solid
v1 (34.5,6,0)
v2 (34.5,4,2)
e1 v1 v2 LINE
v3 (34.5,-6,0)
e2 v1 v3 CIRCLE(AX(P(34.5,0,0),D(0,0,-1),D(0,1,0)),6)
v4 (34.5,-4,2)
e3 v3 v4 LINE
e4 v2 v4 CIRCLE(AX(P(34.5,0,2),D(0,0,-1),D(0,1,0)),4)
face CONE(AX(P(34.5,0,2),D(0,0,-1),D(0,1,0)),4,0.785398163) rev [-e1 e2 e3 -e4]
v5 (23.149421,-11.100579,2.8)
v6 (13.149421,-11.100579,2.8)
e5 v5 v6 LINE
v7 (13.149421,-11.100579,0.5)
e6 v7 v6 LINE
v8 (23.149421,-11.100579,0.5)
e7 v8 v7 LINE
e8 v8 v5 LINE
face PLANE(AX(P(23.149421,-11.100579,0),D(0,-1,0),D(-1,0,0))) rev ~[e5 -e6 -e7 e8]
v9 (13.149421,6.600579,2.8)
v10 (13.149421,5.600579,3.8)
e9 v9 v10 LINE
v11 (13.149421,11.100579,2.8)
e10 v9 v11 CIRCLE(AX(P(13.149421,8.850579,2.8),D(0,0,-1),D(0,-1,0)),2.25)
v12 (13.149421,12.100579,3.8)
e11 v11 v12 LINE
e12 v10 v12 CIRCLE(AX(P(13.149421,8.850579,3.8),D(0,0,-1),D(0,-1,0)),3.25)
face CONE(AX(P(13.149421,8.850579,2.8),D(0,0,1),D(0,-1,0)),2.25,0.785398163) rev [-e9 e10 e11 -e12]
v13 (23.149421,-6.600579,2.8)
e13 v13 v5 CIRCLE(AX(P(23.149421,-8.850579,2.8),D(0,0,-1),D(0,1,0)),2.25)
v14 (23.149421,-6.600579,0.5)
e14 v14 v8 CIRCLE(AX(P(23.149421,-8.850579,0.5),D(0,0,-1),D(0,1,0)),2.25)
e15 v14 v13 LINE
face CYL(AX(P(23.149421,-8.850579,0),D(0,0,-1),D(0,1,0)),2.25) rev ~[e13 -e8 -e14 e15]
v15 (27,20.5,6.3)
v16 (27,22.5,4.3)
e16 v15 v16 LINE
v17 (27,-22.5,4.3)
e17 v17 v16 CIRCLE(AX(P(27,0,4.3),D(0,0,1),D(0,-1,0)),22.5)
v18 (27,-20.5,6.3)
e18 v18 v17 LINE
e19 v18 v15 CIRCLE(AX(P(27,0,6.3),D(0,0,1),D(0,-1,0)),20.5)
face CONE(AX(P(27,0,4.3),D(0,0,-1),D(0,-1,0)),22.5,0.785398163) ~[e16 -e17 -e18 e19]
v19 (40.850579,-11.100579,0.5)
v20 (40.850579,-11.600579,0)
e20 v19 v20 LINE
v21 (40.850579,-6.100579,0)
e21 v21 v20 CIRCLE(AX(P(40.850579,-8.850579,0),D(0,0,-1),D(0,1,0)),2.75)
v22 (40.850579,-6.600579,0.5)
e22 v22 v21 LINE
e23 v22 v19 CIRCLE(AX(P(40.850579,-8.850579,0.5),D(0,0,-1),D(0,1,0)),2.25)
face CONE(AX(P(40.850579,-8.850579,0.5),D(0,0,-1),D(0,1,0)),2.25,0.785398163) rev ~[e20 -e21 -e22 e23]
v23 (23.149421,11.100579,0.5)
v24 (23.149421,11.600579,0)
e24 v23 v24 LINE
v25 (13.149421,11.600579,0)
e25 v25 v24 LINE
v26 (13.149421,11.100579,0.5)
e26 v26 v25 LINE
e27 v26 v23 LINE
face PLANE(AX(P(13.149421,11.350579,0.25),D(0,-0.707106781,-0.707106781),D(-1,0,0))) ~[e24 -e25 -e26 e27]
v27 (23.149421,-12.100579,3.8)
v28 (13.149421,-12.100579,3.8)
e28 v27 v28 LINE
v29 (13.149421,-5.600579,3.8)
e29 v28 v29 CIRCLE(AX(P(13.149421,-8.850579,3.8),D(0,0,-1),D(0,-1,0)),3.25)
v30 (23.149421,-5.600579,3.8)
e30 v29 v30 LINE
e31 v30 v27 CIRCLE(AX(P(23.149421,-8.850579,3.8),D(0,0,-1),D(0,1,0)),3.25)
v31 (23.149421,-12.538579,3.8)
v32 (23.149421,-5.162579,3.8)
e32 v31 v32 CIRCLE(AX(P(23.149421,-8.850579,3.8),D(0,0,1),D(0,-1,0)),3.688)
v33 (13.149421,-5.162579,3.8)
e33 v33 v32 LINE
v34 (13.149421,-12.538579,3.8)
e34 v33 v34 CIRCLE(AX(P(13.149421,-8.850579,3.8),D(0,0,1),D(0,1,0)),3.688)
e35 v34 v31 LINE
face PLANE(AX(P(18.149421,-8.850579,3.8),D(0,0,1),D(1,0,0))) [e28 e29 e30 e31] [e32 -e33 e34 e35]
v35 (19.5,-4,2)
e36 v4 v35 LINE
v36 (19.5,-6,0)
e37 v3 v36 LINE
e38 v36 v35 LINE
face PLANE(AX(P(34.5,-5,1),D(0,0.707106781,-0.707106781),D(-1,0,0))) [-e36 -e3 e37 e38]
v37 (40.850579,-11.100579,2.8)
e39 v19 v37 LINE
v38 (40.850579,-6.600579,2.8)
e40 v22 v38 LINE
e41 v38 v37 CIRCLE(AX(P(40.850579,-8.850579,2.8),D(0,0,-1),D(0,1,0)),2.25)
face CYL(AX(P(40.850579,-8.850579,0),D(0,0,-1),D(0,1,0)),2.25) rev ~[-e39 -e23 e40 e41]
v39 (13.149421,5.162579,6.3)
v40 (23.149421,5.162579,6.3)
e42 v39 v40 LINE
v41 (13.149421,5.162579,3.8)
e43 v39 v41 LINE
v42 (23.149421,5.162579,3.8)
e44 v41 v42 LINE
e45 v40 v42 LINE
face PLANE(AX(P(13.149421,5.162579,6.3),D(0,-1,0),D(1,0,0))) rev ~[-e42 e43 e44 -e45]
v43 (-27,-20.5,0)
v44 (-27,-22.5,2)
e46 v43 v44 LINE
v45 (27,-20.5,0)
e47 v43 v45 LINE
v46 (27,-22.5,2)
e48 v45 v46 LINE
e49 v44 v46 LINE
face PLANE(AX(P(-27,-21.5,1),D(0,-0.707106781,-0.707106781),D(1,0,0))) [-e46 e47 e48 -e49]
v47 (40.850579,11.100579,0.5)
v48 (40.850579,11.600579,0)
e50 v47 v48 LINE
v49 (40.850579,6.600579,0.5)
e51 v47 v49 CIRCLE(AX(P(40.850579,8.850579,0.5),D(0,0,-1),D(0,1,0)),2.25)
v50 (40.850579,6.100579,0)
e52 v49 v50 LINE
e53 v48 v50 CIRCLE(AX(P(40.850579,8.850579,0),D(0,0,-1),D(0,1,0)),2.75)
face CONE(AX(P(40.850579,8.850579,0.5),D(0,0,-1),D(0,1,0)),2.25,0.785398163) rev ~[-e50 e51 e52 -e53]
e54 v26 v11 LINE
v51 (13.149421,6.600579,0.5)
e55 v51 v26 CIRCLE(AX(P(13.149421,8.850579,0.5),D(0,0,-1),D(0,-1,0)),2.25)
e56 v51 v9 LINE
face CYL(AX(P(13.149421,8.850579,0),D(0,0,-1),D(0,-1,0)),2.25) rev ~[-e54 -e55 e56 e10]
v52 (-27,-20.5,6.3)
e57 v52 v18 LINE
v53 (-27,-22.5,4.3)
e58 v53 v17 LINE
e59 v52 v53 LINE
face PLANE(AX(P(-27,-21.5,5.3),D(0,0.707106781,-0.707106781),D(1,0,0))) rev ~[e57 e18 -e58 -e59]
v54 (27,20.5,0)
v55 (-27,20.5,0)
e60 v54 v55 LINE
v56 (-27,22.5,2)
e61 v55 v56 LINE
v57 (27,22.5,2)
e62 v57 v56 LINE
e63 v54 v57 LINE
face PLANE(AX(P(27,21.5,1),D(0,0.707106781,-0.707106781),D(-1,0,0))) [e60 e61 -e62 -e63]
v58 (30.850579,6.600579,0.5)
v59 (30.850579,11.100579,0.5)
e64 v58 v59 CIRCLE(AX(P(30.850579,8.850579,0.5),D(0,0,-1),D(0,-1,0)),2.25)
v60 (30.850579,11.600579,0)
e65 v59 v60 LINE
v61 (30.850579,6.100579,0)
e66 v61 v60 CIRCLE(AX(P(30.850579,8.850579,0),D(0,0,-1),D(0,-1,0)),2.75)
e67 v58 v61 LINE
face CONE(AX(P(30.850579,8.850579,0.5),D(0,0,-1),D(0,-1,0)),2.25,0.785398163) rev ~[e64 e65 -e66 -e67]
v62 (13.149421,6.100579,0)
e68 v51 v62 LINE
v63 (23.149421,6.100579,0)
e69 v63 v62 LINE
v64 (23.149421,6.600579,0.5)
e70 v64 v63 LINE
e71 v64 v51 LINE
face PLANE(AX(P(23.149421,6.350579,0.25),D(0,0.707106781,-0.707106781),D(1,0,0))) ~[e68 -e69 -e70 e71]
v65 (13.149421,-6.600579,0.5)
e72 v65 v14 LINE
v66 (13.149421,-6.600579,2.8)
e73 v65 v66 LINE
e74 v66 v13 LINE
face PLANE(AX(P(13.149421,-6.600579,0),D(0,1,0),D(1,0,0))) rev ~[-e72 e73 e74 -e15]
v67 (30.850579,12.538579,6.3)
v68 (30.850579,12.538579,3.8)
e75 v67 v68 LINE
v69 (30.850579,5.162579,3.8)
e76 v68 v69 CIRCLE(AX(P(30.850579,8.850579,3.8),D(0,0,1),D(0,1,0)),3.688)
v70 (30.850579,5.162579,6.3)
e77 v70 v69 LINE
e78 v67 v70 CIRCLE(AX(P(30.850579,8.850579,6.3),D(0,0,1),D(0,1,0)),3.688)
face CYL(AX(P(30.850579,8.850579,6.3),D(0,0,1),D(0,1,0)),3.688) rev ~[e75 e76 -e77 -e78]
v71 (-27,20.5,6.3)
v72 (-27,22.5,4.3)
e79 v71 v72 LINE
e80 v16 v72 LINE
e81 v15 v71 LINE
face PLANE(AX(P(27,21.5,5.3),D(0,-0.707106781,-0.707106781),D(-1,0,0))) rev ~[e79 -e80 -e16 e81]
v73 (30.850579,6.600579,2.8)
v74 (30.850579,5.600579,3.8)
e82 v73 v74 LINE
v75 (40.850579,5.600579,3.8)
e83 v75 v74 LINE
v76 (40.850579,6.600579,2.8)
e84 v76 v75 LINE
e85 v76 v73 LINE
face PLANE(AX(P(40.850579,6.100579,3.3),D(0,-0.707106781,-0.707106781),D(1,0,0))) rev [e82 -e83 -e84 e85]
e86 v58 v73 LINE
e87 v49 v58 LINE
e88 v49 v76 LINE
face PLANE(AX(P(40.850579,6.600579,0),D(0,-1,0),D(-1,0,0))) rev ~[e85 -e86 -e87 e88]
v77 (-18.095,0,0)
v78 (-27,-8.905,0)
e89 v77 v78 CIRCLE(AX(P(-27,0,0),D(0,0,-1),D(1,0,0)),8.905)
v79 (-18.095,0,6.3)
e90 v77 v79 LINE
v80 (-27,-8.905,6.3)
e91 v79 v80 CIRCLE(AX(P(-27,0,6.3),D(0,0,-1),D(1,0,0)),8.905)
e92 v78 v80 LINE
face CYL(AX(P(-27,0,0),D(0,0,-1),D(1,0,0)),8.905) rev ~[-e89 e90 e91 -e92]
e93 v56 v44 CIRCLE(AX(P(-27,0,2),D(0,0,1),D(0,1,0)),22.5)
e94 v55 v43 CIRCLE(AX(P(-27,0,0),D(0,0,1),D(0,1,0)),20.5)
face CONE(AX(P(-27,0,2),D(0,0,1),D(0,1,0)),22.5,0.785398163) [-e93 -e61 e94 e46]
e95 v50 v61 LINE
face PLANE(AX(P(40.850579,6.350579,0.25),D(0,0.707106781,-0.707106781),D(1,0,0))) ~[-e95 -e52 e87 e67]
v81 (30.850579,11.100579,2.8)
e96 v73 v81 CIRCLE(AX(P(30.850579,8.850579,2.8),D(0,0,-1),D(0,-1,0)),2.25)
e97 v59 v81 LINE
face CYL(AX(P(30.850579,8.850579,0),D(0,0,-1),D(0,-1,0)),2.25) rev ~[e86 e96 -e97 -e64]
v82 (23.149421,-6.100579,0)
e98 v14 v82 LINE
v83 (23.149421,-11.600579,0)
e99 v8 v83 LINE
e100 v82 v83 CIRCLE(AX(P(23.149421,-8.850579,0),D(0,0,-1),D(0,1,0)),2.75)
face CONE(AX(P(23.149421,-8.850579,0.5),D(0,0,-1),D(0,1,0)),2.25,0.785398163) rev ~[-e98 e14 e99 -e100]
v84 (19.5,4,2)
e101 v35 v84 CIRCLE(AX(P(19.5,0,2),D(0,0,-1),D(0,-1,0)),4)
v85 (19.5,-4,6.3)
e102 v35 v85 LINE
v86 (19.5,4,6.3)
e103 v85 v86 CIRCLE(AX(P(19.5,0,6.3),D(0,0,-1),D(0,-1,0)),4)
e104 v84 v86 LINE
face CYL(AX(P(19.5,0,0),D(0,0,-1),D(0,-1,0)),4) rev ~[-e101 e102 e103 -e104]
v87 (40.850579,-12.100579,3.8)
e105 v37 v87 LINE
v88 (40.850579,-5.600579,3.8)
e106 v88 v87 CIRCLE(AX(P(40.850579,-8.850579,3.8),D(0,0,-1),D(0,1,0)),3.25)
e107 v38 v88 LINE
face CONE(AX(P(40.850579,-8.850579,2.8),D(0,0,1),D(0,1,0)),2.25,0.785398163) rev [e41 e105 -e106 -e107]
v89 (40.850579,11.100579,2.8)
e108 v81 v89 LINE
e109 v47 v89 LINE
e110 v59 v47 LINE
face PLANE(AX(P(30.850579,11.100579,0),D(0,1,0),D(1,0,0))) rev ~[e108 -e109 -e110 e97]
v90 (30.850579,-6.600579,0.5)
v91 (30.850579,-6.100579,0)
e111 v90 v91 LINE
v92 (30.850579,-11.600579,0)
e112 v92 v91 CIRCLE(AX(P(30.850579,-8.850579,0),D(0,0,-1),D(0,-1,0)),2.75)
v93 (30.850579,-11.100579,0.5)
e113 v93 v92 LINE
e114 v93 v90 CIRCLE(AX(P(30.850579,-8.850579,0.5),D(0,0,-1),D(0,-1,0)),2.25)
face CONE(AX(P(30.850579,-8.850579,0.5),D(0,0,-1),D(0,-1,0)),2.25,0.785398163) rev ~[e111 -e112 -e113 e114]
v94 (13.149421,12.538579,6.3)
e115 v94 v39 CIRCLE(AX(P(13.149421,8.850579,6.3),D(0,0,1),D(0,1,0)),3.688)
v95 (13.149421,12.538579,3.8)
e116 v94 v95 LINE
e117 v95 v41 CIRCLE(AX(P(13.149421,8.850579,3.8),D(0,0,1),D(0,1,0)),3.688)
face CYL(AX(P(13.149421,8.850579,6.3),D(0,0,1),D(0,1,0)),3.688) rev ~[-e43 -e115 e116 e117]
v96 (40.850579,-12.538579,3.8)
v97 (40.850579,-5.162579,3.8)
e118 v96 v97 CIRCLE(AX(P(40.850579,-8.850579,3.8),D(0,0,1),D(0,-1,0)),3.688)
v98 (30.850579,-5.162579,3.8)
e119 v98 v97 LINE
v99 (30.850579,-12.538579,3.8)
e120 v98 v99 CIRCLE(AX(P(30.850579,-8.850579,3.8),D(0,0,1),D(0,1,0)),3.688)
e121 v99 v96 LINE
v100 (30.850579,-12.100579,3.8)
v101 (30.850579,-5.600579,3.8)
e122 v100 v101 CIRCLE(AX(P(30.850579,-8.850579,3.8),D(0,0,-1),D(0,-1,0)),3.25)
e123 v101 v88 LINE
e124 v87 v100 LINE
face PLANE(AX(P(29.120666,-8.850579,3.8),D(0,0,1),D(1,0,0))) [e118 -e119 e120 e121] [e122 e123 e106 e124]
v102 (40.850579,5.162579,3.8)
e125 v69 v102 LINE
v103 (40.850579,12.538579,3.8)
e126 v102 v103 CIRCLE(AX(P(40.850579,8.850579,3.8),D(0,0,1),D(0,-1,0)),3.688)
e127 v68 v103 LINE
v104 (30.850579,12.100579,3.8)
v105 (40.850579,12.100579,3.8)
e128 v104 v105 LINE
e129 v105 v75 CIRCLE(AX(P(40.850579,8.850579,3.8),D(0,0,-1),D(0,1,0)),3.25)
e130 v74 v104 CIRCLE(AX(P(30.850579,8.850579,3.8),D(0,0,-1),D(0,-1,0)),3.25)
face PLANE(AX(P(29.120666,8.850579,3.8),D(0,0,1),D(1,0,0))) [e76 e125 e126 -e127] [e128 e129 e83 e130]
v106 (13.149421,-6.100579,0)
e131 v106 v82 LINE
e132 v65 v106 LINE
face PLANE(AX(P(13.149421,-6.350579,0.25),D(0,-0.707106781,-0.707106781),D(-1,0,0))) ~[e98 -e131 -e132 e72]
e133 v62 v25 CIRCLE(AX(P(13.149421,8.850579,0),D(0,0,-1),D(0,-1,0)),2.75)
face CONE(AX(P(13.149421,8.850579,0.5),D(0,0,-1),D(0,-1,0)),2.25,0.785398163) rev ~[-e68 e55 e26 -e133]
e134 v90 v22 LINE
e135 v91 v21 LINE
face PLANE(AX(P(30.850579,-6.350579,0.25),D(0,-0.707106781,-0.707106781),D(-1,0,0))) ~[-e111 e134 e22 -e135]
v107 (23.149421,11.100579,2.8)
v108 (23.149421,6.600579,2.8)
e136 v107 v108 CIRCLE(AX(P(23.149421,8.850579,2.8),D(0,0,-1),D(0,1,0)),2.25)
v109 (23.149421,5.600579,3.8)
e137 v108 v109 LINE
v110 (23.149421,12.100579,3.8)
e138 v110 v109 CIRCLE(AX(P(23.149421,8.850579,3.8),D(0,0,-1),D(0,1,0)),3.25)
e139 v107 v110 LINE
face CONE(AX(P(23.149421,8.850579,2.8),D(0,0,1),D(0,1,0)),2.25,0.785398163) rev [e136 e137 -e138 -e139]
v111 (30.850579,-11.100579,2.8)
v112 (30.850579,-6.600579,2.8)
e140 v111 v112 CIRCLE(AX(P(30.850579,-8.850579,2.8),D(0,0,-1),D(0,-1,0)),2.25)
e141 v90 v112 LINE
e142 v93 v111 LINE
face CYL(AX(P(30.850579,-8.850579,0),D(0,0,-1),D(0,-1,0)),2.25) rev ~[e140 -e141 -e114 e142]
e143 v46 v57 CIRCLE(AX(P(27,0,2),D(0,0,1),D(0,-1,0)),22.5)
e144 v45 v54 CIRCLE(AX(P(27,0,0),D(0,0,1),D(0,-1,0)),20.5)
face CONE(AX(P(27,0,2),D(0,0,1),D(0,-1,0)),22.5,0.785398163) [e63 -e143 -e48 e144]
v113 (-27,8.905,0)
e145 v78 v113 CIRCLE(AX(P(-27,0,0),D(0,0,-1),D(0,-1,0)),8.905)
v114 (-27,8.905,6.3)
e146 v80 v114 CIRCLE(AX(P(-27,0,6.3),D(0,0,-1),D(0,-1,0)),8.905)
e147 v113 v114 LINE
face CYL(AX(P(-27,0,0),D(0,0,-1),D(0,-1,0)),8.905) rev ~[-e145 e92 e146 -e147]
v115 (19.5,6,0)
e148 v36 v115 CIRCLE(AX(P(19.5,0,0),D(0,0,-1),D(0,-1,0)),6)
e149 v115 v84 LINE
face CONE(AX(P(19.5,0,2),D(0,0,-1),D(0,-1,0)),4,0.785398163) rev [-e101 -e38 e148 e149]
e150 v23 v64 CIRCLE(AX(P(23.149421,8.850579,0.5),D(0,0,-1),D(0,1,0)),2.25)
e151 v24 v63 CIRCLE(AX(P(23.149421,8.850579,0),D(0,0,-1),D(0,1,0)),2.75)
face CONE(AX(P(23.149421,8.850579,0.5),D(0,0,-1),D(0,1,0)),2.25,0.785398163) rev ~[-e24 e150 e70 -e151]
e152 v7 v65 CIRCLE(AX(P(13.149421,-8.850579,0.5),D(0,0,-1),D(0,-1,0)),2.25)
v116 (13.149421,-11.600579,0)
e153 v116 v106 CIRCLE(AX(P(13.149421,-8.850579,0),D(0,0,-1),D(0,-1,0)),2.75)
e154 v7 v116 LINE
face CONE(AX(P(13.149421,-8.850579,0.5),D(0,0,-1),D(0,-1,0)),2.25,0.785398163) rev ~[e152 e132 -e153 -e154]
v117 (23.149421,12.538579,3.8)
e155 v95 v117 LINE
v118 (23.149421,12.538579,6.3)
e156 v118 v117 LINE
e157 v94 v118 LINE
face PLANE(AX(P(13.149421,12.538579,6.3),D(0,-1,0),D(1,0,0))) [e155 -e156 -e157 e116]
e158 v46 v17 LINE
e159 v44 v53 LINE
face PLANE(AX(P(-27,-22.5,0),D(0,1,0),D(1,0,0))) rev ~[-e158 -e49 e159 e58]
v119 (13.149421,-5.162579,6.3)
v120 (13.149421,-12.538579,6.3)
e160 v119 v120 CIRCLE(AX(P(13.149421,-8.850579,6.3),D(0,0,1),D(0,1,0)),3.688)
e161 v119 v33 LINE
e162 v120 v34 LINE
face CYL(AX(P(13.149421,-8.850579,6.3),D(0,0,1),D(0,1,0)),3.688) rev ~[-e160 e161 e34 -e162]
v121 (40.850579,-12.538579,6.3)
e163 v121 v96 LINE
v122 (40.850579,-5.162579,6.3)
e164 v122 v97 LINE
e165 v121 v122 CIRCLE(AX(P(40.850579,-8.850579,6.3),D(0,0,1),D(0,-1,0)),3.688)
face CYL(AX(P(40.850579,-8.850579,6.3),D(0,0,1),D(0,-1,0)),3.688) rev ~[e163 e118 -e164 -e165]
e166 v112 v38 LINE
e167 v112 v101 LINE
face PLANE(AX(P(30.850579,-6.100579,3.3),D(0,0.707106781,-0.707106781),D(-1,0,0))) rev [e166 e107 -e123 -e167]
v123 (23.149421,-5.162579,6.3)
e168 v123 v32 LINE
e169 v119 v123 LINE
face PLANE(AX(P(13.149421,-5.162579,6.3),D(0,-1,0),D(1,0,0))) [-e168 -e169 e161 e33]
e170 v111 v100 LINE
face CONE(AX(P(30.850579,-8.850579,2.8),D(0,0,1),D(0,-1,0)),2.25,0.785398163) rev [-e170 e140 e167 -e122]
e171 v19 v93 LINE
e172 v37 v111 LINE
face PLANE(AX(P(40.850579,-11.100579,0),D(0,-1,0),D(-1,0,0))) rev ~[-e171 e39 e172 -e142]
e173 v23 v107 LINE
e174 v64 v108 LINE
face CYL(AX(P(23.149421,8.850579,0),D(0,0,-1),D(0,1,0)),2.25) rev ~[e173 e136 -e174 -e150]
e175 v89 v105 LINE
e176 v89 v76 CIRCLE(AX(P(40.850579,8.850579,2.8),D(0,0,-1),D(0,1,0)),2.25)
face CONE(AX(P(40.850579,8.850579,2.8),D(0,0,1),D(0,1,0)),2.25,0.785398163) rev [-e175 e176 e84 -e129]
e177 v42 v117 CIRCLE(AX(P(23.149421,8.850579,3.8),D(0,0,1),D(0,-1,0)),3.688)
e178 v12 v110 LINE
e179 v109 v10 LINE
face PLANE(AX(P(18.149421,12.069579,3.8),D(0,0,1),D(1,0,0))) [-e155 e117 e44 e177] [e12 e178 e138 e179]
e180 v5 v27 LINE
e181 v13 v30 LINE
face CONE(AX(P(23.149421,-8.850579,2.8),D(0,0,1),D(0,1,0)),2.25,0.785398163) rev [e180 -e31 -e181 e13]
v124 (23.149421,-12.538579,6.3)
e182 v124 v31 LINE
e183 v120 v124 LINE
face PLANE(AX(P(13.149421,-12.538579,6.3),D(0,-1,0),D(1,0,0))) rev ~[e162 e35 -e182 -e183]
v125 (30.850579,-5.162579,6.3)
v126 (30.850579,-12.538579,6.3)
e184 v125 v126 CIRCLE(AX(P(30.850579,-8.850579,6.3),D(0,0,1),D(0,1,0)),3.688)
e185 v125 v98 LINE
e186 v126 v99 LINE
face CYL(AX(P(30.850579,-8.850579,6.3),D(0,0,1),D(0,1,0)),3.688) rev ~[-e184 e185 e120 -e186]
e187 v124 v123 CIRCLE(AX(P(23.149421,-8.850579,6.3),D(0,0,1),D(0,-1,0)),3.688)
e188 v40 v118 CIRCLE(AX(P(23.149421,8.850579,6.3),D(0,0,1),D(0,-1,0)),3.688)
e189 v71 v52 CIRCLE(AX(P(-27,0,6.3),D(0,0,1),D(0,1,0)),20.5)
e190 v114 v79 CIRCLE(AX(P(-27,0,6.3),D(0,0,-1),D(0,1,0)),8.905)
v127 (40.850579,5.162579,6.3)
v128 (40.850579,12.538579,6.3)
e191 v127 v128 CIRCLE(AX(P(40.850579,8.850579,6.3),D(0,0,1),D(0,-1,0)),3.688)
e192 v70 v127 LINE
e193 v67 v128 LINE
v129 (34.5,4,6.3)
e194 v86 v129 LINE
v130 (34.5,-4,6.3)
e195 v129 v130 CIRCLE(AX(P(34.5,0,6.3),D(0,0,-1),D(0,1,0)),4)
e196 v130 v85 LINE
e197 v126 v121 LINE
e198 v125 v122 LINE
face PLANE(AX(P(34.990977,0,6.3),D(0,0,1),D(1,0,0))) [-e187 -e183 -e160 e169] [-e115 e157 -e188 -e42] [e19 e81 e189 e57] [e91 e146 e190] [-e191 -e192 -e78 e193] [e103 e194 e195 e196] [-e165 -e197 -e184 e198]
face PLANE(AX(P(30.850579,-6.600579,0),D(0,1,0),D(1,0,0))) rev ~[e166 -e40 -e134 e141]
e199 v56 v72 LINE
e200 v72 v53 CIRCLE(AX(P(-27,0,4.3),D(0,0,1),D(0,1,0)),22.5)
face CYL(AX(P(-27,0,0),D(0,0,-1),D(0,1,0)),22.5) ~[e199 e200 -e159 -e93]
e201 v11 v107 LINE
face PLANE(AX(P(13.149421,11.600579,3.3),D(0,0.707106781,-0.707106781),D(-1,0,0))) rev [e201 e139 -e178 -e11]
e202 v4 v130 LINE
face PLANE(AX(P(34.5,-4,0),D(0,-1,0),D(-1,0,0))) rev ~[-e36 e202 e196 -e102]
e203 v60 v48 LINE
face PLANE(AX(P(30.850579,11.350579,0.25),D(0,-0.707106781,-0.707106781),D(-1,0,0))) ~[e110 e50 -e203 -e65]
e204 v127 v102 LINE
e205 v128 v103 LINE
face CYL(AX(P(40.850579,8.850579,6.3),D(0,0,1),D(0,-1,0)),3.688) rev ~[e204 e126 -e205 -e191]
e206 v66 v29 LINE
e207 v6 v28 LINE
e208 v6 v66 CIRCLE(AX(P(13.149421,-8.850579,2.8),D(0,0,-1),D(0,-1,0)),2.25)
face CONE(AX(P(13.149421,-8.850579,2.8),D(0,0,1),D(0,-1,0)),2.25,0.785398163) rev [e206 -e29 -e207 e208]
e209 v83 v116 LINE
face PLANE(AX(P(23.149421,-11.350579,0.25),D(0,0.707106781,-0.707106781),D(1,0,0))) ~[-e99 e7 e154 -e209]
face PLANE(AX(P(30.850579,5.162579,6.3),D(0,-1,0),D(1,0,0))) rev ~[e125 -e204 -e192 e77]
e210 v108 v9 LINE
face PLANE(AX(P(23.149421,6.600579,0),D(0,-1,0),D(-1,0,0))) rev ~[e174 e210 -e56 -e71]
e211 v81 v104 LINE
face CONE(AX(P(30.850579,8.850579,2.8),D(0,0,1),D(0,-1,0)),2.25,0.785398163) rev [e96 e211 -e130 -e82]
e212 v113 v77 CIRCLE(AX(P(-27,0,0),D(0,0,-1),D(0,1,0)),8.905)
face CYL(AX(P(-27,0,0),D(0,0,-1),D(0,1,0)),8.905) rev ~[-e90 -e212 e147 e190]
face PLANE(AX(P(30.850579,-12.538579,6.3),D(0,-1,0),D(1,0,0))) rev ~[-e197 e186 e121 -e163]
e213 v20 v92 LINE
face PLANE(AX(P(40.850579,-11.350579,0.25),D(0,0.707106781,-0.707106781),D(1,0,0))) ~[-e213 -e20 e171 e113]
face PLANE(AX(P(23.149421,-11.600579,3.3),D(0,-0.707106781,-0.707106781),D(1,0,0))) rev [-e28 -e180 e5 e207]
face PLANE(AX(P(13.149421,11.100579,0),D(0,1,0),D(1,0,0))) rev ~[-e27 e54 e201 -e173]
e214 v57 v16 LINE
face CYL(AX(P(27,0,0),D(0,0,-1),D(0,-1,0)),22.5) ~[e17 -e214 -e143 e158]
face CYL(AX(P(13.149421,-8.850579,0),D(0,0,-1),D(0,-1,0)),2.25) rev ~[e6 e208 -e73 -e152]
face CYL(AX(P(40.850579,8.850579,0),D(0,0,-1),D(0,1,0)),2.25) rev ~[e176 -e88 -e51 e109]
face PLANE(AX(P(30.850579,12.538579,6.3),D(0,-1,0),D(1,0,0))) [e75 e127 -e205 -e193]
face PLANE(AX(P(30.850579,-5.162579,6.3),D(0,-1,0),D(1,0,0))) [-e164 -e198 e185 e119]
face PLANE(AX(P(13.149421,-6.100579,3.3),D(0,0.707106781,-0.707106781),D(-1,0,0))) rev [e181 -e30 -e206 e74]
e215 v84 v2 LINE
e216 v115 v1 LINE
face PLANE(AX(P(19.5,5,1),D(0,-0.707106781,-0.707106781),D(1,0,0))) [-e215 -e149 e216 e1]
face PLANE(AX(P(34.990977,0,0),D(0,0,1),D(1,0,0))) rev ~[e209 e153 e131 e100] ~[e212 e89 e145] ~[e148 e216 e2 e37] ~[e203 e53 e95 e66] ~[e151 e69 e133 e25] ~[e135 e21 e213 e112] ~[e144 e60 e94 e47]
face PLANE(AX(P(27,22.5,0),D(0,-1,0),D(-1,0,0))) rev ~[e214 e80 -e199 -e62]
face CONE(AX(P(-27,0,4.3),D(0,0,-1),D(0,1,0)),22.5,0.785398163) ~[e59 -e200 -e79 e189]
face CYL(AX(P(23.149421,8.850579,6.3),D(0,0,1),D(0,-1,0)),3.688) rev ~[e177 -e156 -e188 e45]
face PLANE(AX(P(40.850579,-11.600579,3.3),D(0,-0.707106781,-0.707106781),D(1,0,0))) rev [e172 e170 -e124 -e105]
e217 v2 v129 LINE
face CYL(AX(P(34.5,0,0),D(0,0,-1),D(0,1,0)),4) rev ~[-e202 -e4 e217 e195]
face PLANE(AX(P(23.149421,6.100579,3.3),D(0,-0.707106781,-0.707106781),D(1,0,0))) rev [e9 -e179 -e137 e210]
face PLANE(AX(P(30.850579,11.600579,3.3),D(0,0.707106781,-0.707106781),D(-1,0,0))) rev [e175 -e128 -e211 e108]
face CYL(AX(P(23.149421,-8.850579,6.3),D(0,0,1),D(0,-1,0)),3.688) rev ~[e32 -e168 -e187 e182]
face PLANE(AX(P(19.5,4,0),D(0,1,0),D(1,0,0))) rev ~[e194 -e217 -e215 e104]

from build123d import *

# Parameters (mm, degrees)
F1_DEPTH = 6.3
F2_SIZE  = 0.5
F3_SIZE  = 2
F4_W     = 10
F4_H     = 0.938
F4_H_2   = 5.5
F5_DEPTH = 2.5
F6_SIZE  = 1
F7_SIZE  = 2


# Not quite as in the source:
# - a feature names something its author has since deleted; it is built from what else it names


with BuildPart() as f1:
    # F0 (on Top) → F1 (new body)
    with BuildSketch(Plane.XY):
        with BuildLine():
            ThreePointArc((27, -22.5), (49.5, 0), (27, 22.5))
            Line((27, 22.5), (27, 4))
            Line((27, 4), (34.5, 4))
            ThreePointArc((34.5, 4), (38.5, 0), (34.5, -4))
            Line((34.5, -4), (27, -4))
            Line((27, -4), (27, -22.5))
        make_face()
        with BuildLine():
            ThreePointArc((30.8505792452, -11.1005792452), (28.6005792452, -8.8505792452), (30.8505792452, -6.6005792452))
            Line((30.8505792452, -6.6005792452), (40.8505792452, -6.6005792452))
            ThreePointArc((40.8505792452, -6.6005792452), (43.1005792452, -8.8505792452), (40.8505792452, -11.1005792452))
            Line((40.8505792452, -11.1005792452), (30.8505792452, -11.1005792452))
        make_face(mode=Mode.SUBTRACT)
        with BuildLine():
            ThreePointArc((30.8505792452, 6.6005792452), (28.6005792452, 8.8505792452), (30.8505792452, 11.1005792452))
            Line((30.8505792452, 11.1005792452), (40.8505792452, 11.1005792452))
            ThreePointArc((40.8505792452, 11.1005792452), (43.1005792452, 8.8505792452), (40.8505792452, 6.6005792452))
            Line((40.8505792452, 6.6005792452), (30.8505792452, 6.6005792452))
        make_face(mode=Mode.SUBTRACT)
        with BuildLine():
            Line((27, 4), (27, 22.5))
            Line((27, 22.5), (-27, 22.5))
            Line((-27, 22.5), (-27, 8.905))
            ThreePointArc((-27, 8.905), (-20.7032141135, 6.2967858865), (-18.095, 0))
            ThreePointArc((-18.095, 0), (-20.7032141135, -6.2967858865), (-27, -8.905))
            Line((-27, -8.905), (-27, -22.5))
            Line((-27, -22.5), (27, -22.5))
            Line((27, -22.5), (27, -4))
            Line((27, -4), (19.5, -4))
            ThreePointArc((19.5, -4), (15.5, 0), (19.5, 4))
            Line((19.5, 4), (27, 4))
        make_face()
        with BuildLine():
            Line((23.1494207548, -11.1005792452), (13.1494207548, -11.1005792452))
            ThreePointArc((13.1494207548, -11.1005792452), (10.8994207548, -8.8505792452), (13.1494207548, -6.6005792452))
            Line((13.1494207548, -6.6005792452), (23.1494207548, -6.6005792452))
            ThreePointArc((23.1494207548, -6.6005792452), (25.3994207548, -8.8505792452), (23.1494207548, -11.1005792452))
        make_face(mode=Mode.SUBTRACT)
        with BuildLine():
            ThreePointArc((13.1494207548, 6.6005792452), (10.8994207548, 8.8505792452), (13.1494207548, 11.1005792452))
            Line((13.1494207548, 11.1005792452), (23.1494207548, 11.1005792452))
            ThreePointArc((23.1494207548, 11.1005792452), (25.3994207548, 8.8505792452), (23.1494207548, 6.6005792452))
            Line((23.1494207548, 6.6005792452), (13.1494207548, 6.6005792452))
        make_face(mode=Mode.SUBTRACT)
        with BuildLine():
            Line((-27, 8.905), (-27, 22.5))
            ThreePointArc((-27, 22.5), (-49.5, 0), (-27, -22.5))
            Line((-27, -22.5), (-27, -8.905))
            ThreePointArc((-27, -8.905), (-35.905, 0), (-27, 8.905))
        make_face()
    extrude(amount=F1_DEPTH)

    # F2
    f2_edges = [f1.edges().sort_by_distance(p)[0] for p in [
        (18.149421, 11.100579, 6.3),
        (35.850579, 11.100579, 6.3),
        (35.850579, -6.600579, 6.3),
        (18.149421, -6.600579, 6.3),
        (35.850579, 11.100579, 0),
        (18.149421, 11.100579, 0),
        (35.850579, -6.600579, 0),
        (18.149421, -6.600579, 0),
        (43.100579, -8.850579, 0),
        (35.850579, -11.100579, 0),
        (28.600579, -8.850579, 0),
        (43.100579, 8.850579, 0),
        (35.850579, 6.600579, 0),
        (28.600579, 8.850579, 0),
        (18.149421, 6.600579, 0),
        (10.899421, 8.850579, 0),
        (25.399421, 8.850579, 0),
        (18.149421, -11.100579, 0),
        (10.899421, -8.850579, 0),
        (25.399421, -8.850579, 0),
    ]]
    chamfer(f2_edges, length=F2_SIZE)

    # F3
    f3_edges = [f1.edges().sort_by_distance(p)[0] for p in [
        (0, -22.5, 6.3),
        (0, -22.5, 0),
    ]]
    chamfer(f3_edges, length=F3_SIZE)

    # F4 (on face) → F5 (cut)
    with BuildSketch(Plane.XY.offset(6.3)):
        with Locations((18.1494207548, 12.0695792452)):
            Rectangle(F4_W, F4_H)
        with BuildLine():
            Line((13.1494207548, 11.6005792452), (13.1494207548, 12.5385792452))
            ThreePointArc((13.1494207548, 12.5385792452), (9.4614207548, 8.8505792452), (13.1494207548, 5.1625792452))
            Line((13.1494207548, 5.1625792452), (13.1494207548, 6.1005792452))
            ThreePointArc((13.1494207548, 6.1005792452), (10.3994207548, 8.8505792452), (13.1494207548, 11.6005792452))
        make_face()
        with BuildLine():
            Line((13.1494207548, 6.1005792452), (13.1494207548, 11.6005792452))
            ThreePointArc((13.1494207548, 11.6005792452), (10.3994207548, 8.8505792452), (13.1494207548, 6.1005792452))
        make_face()
        with Locations((18.1494207548, 8.8505792452)):
            Rectangle(F4_W, F4_H_2)
        with Locations((18.1494207548, 5.6315792452)):
            Rectangle(F4_W, F4_H)
        with BuildLine():
            ThreePointArc((23.1494207548, 6.1005792452), (25.8994207548, 8.8505792452), (23.1494207548, 11.6005792452))
            Line((23.1494207548, 11.6005792452), (23.1494207548, 6.1005792452))
        make_face()
        with BuildLine():
            ThreePointArc((23.1494207548, 5.1625792452), (26.8374207548, 8.8505792452), (23.1494207548, 12.5385792452))
            Line((23.1494207548, 12.5385792452), (23.1494207548, 11.6005792452))
            ThreePointArc((23.1494207548, 11.6005792452), (25.8994207548, 8.8505792452), (23.1494207548, 6.1005792452))
            Line((23.1494207548, 6.1005792452), (23.1494207548, 5.1625792452))
        make_face()
        with BuildLine():
            ThreePointArc((30.8505792452, 12.5385792452), (27.1625792452, 8.8505792452), (30.8505792452, 5.1625792452))
            Line((30.8505792452, 5.1625792452), (30.8505792452, 6.1005792452))
            ThreePointArc((30.8505792452, 6.1005792452), (28.1005792452, 8.8505792452), (30.8505792452, 11.6005792452))
            Line((30.8505792452, 11.6005792452), (30.8505792452, 12.5385792452))
        make_face()
        with BuildLine():
            ThreePointArc((30.8505792452, 11.6005792452), (28.1005792452, 8.8505792452), (30.8505792452, 6.1005792452))
            Line((30.8505792452, 6.1005792452), (30.8505792452, 11.6005792452))
        make_face()
        with Locations((35.8505792452, 8.8505792452)):
            Rectangle(F4_W, F4_H_2)
        with Locations((35.8505792452, 12.0695792452)):
            Rectangle(F4_W, F4_H)
        with Locations((35.8505792452, 5.6315792452)):
            Rectangle(F4_W, F4_H)
        with BuildLine():
            Line((40.8505792452, 6.1005792452), (40.8505792452, 5.1625792452))
            ThreePointArc((40.8505792452, 5.1625792452), (44.5385792452, 8.8505792452), (40.8505792452, 12.5385792452))
            Line((40.8505792452, 12.5385792452), (40.8505792452, 11.6005792452))
            ThreePointArc((40.8505792452, 11.6005792452), (43.6005792452, 8.8505792452), (40.8505792452, 6.1005792452))
        make_face()
        with BuildLine():
            Line((40.8505792452, 11.6005792452), (40.8505792452, 6.1005792452))
            ThreePointArc((40.8505792452, 6.1005792452), (43.6005792452, 8.8505792452), (40.8505792452, 11.6005792452))
        make_face()
        with Locations((18.1494207548, -8.8505792452)):
            Rectangle(F4_W, F4_H_2)
        with BuildLine():
            ThreePointArc((13.1494207548, -6.1005792452), (10.3994207548, -8.8505792452), (13.1494207548, -11.6005792452))
            Line((13.1494207548, -11.6005792452), (13.1494207548, -6.1005792452))
        make_face()
        with BuildLine():
            Line((23.1494207548, -6.1005792452), (23.1494207548, -11.6005792452))
            ThreePointArc((23.1494207548, -11.6005792452), (25.8994207548, -8.8505792452), (23.1494207548, -6.1005792452))
        make_face()
        with Locations((18.1494207548, -5.6315792452)):
            Rectangle(F4_W, F4_H)
        with BuildLine():
            Line((23.1494207548, -11.6005792452), (23.1494207548, -12.5385792452))
            ThreePointArc((23.1494207548, -12.5385792452), (26.8374207548, -8.8505792452), (23.1494207548, -5.1625792452))
            Line((23.1494207548, -5.1625792452), (23.1494207548, -6.1005792452))
            ThreePointArc((23.1494207548, -6.1005792452), (25.8994207548, -8.8505792452), (23.1494207548, -11.6005792452))
        make_face()
        with Locations((18.1494207548, -12.0695792452)):
            Rectangle(F4_W, F4_H)
        with BuildLine():
            ThreePointArc((13.1494207548, -5.1625792452), (9.4614207548, -8.8505792452), (13.1494207548, -12.5385792452))
            Line((13.1494207548, -12.5385792452), (13.1494207548, -11.6005792452))
            ThreePointArc((13.1494207548, -11.6005792452), (10.3994207548, -8.8505792452), (13.1494207548, -6.1005792452))
            Line((13.1494207548, -6.1005792452), (13.1494207548, -5.1625792452))
        make_face()
        with BuildLine():
            ThreePointArc((30.8505792452, -5.1625792452), (27.1625792452, -8.8505792452), (30.8505792452, -12.5385792452))
            Line((30.8505792452, -12.5385792452), (30.8505792452, -11.6005792452))
            ThreePointArc((30.8505792452, -11.6005792452), (28.1005792452, -8.8505792452), (30.8505792452, -6.1005792452))
            Line((30.8505792452, -6.1005792452), (30.8505792452, -5.1625792452))
        make_face()
        with Locations((35.8505792452, -5.6315792452)):
            Rectangle(F4_W, F4_H)
        with Locations((35.8505792452, -8.8505792452)):
            Rectangle(F4_W, F4_H_2)
        with Locations((35.8505792452, -12.0695792452)):
            Rectangle(F4_W, F4_H)
        with BuildLine():
            ThreePointArc((30.8505792452, -6.1005792452), (28.1005792452, -8.8505792452), (30.8505792452, -11.6005792452))
            Line((30.8505792452, -11.6005792452), (30.8505792452, -6.1005792452))
        make_face()
        with BuildLine():
            Line((40.8505792452, -6.1005792452), (40.8505792452, -11.6005792452))
            ThreePointArc((40.8505792452, -11.6005792452), (43.6005792452, -8.8505792452), (40.8505792452, -6.1005792452))
        make_face()
        with BuildLine():
            Line((40.8505792452, -11.6005792452), (40.8505792452, -12.5385792452))
            ThreePointArc((40.8505792452, -12.5385792452), (44.5385792452, -8.8505792452), (40.8505792452, -5.1625792452))
            Line((40.8505792452, -5.1625792452), (40.8505792452, -6.1005792452))
            ThreePointArc((40.8505792452, -6.1005792452), (43.6005792452, -8.8505792452), (40.8505792452, -11.6005792452))
        make_face()
    extrude(amount=-F5_DEPTH, mode=Mode.SUBTRACT)

    # F6
    f6_edges = [f1.edges().sort_by_distance(p)[0] for p in [
        (10.899421, 8.850579, 3.8),
        (18.149421, 6.600579, 3.8),
        (25.399421, 8.850579, 3.8),
        (18.149421, 11.100579, 3.8),
        (35.850579, 11.100579, 3.8),
        (28.600579, 8.850579, 3.8),
        (43.100579, 8.850579, 3.8),
        (35.850579, 6.600579, 3.8),
        (35.850579, -6.600579, 3.8),
        (28.600579, -8.850579, 3.8),
        (43.100579, -8.850579, 3.8),
        (35.850579, -11.100579, 3.8),
        (18.149421, -6.600579, 3.8),
        (10.899421, -8.850579, 3.8),
        (25.399421, -8.850579, 3.8),
        (18.149421, -11.100579, 3.8),
    ]]
    chamfer(f6_edges, length=F6_SIZE)

    # F7
    f7_edges = [f1.edges().sort_by_distance(p)[0] for p in [
        (27, 4, 0),
        (38.5, 0, 0),
        (27, -4, 0),
        (15.5, 0, 0),
    ]]
    chamfer(f7_edges, length=F7_SIZE)


solid = f1.part
